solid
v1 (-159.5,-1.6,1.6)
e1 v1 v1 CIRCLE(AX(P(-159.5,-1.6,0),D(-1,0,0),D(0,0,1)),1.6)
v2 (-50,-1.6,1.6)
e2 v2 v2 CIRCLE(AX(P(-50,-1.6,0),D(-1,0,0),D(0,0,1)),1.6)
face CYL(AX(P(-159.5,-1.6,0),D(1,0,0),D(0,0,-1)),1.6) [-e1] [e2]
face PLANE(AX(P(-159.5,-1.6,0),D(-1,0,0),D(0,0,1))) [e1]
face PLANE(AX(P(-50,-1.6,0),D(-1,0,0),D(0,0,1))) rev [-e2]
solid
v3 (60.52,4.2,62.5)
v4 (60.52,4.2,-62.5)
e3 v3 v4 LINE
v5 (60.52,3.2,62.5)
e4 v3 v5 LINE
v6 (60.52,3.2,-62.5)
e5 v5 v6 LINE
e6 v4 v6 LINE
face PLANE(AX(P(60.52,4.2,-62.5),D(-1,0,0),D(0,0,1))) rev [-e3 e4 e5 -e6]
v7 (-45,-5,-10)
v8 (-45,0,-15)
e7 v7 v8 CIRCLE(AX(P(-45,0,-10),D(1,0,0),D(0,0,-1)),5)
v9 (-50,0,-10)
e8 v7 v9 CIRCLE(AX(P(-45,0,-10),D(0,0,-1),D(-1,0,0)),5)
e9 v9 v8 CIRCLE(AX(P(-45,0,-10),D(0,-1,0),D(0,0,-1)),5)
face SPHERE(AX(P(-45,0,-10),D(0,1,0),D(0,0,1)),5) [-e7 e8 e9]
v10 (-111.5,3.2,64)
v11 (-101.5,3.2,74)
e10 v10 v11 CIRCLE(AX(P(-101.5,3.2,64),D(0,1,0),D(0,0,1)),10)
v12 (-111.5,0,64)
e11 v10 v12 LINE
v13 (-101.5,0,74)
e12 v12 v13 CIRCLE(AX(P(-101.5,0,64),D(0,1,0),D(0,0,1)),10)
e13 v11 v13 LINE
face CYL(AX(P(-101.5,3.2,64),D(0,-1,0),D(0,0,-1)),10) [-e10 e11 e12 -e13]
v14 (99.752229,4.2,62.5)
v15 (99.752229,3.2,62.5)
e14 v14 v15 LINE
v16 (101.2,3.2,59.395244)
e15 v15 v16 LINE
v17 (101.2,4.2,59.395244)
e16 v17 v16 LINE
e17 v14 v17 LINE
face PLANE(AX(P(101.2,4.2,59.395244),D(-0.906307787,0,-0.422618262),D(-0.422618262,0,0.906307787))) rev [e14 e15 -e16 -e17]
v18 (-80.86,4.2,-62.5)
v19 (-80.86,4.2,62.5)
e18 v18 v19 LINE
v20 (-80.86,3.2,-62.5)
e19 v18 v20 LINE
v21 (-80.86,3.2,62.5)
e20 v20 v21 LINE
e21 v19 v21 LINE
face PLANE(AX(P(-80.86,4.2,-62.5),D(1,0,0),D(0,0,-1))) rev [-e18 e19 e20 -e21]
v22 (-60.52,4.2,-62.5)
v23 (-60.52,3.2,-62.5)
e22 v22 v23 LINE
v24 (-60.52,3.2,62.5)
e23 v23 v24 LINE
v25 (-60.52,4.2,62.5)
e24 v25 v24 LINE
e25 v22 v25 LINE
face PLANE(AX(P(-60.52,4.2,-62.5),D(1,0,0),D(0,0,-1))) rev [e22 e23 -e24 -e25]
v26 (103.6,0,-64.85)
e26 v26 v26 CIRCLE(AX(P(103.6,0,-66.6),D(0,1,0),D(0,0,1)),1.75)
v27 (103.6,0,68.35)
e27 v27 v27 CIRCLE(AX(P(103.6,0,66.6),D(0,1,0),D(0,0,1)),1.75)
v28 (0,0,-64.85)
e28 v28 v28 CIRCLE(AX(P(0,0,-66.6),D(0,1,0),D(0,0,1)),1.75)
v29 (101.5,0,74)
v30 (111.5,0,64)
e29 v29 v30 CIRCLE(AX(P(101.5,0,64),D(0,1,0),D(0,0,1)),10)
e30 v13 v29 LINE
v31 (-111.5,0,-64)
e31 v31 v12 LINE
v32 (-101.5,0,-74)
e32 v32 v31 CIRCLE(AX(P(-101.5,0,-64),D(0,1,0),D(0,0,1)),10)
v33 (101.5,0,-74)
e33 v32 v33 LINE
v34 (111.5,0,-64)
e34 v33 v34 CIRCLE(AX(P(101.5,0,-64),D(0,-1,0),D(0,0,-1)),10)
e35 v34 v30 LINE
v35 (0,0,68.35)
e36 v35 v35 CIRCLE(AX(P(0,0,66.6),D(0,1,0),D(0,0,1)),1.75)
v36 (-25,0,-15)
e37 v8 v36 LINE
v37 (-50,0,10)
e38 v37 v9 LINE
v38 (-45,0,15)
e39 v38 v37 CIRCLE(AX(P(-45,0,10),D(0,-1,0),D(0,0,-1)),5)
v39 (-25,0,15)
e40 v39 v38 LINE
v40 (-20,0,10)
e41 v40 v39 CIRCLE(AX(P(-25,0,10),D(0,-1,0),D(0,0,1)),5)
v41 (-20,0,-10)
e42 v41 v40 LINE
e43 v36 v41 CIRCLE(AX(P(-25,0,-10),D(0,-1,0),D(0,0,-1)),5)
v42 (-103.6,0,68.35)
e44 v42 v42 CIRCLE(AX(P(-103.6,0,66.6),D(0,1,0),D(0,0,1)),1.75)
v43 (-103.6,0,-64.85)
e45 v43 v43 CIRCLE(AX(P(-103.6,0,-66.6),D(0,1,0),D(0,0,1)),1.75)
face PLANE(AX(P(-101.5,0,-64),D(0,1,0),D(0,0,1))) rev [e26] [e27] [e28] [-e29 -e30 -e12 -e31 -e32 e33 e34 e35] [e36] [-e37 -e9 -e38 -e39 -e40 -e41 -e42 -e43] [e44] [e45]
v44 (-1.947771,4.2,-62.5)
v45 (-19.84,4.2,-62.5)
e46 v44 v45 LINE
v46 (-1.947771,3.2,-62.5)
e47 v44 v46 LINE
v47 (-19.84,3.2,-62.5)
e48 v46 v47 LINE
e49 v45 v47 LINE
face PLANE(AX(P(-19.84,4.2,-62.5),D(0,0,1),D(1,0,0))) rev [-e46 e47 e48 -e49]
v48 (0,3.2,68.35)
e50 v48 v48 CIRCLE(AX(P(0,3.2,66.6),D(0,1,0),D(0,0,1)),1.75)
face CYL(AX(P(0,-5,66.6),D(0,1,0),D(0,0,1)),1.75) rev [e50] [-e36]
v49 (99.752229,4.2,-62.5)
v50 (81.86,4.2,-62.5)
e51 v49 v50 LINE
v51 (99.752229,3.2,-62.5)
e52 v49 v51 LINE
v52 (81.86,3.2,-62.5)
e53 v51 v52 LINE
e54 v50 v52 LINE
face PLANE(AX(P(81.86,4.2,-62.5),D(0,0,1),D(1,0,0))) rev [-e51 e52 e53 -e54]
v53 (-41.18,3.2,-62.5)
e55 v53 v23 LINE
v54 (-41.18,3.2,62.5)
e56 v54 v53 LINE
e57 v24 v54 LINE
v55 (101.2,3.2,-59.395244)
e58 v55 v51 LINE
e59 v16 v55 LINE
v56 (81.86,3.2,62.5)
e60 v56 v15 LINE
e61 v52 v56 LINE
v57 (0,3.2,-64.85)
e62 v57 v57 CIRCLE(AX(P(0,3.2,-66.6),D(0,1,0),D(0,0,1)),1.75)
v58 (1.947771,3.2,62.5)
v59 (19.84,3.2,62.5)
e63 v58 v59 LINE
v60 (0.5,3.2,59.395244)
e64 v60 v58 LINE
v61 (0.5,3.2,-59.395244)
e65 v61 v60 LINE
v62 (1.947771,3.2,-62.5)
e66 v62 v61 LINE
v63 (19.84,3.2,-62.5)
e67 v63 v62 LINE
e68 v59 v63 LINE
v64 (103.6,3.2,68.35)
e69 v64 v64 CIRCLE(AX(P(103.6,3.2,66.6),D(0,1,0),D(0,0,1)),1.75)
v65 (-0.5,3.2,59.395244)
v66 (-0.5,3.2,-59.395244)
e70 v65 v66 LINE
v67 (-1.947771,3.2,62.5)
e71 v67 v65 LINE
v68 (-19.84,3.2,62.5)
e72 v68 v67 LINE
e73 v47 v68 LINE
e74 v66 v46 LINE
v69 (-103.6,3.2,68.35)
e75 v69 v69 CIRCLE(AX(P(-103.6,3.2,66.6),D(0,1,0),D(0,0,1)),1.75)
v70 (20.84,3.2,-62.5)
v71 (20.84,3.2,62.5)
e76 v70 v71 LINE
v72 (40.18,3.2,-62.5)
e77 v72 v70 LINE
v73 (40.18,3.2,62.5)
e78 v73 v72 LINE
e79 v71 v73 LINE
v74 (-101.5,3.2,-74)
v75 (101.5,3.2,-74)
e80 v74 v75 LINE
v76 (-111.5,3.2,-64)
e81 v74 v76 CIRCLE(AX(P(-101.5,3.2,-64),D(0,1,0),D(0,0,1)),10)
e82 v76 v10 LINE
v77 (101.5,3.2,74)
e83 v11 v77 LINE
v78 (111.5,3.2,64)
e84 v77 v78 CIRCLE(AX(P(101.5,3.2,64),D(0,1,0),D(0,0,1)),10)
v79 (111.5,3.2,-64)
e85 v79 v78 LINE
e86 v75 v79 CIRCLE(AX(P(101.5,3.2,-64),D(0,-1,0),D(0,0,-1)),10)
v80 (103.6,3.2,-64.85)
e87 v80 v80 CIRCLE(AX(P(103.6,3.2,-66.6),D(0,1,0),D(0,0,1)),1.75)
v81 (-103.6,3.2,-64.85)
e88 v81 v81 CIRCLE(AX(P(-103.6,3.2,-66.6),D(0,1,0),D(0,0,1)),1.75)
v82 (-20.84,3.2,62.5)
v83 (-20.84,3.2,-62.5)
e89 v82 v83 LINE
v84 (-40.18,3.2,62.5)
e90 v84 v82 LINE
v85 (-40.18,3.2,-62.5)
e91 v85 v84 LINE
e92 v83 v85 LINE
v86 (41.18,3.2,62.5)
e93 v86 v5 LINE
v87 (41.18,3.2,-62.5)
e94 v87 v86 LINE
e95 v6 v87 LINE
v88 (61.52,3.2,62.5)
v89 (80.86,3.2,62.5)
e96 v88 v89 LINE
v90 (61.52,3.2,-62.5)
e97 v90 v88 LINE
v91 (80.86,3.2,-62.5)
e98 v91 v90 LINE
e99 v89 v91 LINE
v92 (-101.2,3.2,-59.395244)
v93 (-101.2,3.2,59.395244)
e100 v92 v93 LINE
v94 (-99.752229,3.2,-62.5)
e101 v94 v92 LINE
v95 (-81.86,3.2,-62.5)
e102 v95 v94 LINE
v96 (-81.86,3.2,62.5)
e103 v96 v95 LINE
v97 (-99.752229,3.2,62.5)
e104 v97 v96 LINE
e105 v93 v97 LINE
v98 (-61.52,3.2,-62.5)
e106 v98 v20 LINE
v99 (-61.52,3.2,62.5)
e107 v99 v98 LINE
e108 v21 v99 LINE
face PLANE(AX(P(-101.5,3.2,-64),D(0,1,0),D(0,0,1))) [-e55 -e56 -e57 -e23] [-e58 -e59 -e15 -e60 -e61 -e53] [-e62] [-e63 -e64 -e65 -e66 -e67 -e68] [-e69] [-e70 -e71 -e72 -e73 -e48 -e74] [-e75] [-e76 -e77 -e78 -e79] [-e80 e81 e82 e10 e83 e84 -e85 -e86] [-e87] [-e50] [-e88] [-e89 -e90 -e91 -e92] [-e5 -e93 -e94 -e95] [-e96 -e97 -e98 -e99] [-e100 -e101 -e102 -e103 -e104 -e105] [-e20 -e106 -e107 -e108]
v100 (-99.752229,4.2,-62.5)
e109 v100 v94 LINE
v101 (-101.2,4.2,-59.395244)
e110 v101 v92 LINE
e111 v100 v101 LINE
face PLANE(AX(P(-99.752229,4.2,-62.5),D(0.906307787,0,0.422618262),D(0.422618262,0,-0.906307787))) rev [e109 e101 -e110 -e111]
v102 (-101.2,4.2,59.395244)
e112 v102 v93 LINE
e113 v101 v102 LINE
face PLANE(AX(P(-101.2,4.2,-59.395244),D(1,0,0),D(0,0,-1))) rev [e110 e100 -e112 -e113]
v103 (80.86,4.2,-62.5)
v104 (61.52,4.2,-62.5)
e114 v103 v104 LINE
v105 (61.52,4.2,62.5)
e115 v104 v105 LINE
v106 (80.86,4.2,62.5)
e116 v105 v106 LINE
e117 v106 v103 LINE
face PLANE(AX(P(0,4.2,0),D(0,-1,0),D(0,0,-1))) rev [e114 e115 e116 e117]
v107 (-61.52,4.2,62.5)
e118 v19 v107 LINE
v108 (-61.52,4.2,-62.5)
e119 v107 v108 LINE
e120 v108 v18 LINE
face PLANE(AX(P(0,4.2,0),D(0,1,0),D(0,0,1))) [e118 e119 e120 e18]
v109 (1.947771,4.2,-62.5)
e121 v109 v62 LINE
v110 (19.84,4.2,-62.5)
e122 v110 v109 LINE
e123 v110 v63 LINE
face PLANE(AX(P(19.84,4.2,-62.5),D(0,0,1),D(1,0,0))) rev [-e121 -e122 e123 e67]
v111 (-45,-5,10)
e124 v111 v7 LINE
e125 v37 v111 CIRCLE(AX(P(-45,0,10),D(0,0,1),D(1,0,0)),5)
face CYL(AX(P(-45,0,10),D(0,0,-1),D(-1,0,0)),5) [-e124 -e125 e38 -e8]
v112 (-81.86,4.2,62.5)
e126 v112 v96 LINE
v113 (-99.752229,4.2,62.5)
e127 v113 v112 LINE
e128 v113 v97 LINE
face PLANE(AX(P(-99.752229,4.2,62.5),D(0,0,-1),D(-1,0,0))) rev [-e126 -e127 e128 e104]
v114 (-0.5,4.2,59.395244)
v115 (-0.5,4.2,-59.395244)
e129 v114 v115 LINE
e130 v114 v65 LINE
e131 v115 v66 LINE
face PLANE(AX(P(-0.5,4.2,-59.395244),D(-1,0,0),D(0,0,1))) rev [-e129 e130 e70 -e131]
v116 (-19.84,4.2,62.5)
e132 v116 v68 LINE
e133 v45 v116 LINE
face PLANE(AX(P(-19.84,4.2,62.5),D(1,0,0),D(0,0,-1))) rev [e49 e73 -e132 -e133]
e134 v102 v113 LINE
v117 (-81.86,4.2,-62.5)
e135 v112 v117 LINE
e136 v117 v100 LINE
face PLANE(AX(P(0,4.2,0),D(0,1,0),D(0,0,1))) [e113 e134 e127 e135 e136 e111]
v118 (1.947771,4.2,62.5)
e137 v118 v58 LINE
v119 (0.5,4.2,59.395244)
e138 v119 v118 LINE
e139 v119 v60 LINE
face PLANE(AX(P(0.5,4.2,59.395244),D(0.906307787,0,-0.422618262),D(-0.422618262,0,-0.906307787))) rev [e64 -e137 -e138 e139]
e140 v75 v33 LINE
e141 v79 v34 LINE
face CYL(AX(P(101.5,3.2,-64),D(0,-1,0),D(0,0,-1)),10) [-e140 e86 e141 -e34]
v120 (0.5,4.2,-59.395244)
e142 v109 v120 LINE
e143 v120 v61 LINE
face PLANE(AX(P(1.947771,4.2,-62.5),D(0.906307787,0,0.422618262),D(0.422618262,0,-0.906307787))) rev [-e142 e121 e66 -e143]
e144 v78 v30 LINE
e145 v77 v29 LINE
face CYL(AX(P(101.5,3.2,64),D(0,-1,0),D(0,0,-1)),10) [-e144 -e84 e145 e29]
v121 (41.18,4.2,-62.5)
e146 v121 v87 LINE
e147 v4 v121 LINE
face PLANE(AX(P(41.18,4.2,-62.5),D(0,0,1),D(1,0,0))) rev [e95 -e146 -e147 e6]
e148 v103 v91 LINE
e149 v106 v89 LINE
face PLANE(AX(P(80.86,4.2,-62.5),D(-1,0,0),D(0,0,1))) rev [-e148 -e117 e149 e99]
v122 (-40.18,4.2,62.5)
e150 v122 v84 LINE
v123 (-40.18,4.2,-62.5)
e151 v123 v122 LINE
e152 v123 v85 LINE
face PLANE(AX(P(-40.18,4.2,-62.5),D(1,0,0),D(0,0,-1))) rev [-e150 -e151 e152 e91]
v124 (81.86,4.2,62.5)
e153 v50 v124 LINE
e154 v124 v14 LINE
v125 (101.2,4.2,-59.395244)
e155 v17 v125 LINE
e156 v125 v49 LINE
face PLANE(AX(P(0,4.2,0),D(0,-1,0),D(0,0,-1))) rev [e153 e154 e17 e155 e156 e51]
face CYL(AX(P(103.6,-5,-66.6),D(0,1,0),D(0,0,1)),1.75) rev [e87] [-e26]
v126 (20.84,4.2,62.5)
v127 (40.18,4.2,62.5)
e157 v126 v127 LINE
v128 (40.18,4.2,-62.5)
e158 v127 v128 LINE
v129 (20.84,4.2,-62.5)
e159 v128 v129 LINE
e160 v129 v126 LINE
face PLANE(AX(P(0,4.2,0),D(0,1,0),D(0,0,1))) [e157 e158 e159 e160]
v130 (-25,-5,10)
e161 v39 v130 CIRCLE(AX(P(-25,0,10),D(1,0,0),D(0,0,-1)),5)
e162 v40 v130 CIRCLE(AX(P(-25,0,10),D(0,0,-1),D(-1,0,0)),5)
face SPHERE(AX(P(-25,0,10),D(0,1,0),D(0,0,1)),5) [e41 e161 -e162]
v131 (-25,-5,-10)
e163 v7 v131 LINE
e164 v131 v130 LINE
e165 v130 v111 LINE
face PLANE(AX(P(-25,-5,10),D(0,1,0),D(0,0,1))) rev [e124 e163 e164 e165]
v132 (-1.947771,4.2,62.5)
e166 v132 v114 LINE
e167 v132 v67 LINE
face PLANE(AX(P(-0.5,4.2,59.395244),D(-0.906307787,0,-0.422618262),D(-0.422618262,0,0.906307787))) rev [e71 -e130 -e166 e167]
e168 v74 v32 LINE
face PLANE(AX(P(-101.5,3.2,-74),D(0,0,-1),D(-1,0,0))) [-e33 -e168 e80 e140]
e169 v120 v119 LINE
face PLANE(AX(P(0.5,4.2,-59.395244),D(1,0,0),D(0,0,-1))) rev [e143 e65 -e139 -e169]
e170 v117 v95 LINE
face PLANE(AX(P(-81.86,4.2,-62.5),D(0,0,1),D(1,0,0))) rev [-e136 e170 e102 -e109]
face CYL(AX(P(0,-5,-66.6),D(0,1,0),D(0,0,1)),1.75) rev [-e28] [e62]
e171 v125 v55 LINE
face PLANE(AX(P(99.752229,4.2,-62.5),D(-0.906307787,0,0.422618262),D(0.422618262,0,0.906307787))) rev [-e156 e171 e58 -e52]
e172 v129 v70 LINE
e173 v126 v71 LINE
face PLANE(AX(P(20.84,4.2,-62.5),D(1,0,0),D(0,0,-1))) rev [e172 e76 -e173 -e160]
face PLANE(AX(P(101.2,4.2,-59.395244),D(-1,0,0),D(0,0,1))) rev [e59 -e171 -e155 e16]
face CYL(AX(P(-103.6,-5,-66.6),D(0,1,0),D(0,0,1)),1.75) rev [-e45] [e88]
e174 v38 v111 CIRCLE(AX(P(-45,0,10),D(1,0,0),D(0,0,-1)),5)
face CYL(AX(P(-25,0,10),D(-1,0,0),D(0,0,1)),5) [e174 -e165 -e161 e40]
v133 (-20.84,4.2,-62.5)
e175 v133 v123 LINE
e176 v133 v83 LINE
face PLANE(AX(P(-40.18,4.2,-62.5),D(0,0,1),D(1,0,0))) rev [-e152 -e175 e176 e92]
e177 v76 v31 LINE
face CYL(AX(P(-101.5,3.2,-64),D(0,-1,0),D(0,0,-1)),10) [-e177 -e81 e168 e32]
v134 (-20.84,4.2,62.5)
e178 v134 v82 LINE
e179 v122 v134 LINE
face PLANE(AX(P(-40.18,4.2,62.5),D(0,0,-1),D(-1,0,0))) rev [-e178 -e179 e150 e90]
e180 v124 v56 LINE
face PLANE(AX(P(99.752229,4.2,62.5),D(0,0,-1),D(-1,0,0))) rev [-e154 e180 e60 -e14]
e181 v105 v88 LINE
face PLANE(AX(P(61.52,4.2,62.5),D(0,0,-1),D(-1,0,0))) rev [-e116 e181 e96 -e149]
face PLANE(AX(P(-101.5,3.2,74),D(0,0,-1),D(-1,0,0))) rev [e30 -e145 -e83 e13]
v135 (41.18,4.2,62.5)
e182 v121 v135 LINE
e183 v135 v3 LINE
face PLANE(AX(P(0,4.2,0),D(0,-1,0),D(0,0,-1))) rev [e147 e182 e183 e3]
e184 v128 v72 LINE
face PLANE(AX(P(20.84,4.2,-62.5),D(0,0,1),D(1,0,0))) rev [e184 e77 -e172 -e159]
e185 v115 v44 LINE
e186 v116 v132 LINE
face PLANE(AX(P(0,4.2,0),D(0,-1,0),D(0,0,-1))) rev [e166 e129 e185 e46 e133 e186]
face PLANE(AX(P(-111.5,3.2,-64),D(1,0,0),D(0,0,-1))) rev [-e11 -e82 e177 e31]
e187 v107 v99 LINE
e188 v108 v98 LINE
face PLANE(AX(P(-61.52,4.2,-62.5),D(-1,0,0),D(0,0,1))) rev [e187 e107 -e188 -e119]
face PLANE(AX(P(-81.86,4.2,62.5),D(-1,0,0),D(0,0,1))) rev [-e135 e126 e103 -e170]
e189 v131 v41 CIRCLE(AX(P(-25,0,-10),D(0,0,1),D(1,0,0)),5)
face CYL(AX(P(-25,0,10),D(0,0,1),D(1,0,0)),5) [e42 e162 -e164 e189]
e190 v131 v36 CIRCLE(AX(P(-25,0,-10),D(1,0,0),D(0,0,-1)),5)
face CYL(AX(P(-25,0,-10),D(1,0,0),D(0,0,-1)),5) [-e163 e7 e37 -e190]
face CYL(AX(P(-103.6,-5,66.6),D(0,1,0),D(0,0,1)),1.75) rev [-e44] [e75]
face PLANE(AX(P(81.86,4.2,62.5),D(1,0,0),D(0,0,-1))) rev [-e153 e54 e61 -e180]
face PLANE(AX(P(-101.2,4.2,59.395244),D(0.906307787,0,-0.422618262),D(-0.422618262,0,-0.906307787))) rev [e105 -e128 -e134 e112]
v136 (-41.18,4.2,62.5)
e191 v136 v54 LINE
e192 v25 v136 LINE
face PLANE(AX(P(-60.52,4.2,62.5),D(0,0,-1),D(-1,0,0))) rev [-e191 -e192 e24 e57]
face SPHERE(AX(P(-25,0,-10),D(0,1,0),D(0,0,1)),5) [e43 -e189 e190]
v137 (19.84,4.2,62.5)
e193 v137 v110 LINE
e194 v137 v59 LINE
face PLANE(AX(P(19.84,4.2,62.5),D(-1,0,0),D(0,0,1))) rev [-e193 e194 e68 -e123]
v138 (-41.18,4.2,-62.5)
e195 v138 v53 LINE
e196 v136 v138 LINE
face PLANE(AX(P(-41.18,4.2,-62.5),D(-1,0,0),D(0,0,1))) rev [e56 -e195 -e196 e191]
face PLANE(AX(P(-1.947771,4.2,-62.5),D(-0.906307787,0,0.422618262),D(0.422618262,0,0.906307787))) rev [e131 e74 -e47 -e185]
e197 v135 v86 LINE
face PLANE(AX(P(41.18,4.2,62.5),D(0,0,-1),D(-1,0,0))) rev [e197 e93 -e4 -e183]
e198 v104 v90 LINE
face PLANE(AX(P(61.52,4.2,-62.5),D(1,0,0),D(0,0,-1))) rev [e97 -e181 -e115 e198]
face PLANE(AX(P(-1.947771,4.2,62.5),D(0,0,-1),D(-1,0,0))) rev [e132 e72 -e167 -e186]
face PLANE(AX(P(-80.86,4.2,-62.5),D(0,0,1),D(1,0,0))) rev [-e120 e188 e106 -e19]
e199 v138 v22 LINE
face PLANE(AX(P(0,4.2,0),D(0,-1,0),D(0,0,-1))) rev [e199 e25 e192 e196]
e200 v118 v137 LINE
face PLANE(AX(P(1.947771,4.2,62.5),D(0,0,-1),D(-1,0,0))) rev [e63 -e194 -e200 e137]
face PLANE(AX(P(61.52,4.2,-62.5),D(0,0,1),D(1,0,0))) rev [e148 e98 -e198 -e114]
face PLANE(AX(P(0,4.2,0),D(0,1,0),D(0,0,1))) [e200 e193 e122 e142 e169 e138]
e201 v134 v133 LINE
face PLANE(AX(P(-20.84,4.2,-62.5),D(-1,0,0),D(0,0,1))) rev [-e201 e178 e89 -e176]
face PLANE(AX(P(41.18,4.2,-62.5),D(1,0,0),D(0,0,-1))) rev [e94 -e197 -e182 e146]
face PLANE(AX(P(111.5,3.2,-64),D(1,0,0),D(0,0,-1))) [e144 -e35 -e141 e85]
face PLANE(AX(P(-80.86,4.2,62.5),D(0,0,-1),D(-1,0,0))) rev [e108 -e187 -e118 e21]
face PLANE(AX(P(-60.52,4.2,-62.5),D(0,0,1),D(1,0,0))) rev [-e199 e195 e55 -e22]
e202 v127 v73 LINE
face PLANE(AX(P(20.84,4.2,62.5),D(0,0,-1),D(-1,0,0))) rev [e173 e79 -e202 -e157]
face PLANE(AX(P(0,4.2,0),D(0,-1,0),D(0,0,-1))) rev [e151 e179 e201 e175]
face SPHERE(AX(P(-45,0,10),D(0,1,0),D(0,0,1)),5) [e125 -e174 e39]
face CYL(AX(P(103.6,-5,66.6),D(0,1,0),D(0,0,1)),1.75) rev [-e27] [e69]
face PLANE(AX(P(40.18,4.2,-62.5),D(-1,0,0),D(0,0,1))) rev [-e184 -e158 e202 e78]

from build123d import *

# Parameters (mm, degrees)
BOSS_EXTRUDE1_DEPTH      = 3.2
BOSS_EXTRUDE2_DEPTH      = 5
FILLET1_R                = 5
BOSS_EXTRUDE5_DEPTH      = 48
BOSS_EXTRUDE5_DEPTH_BACK = 61.5
SKETCH3_R                = 1.6
SKETCH4_R                = 1.75
CUT_EXTRUDE2_DEPTH       = 177.021277123
SKETCH5_W                = 19.34
SKETCH5_H                = 125
BOSS_EXTRUDE6_DEPTH      = 1


with BuildPart() as part:
    # Sketch1 → Boss-Extrude1 (new body)
    with BuildSketch(Plane(origin=(0, 0, 0), x_dir=(1, 0, 0), z_dir=(0, 1, 0))):
        with BuildLine():
            Line((-101.5, 74), (101.5, 74))
            ThreePointArc((101.5, 74), (108.571067812, 71.071067812), (111.5, 64))
            Line((111.5, 64), (111.5, -64))
            ThreePointArc((111.5, -64), (108.571067812, -71.071067812), (101.5, -74))
            Line((101.5, -74), (-101.5, -74))
            ThreePointArc((-101.5, -74), (-108.571067812, -71.071067812), (-111.5, -64))
            Line((-111.5, -64), (-111.5, 64))
            ThreePointArc((-111.5, 64), (-108.571067812, 71.071067812), (-101.5, 74))
        make_face()
    extrude(amount=BOSS_EXTRUDE1_DEPTH)

    # Sketch2 → Boss-Extrude2 (add)
    with BuildSketch(Plane.XZ):
        with BuildLine():
            Line((-45, 15), (-25, 15))
            ThreePointArc((-25, 15), (-21.464466094, 13.535533906), (-20, 10))
            Line((-20, 10), (-20, -10))
            ThreePointArc((-20, -10), (-21.464466094, -13.535533906), (-25, -15))
            Line((-25, -15), (-45, -15))
            ThreePointArc((-45, -15), (-48.535533906, -13.535533906), (-50, -10))
            Line((-50, -10), (-50, 10))
            ThreePointArc((-50, 10), (-48.535533906, 13.535533906), (-45, 15))
        make_face()
    extrude(amount=BOSS_EXTRUDE2_DEPTH)

    # Fillet1
    fillet1_edges = [part.edges().sort_by_distance(p)[0] for p in [
        (-20, -5, 0),
        (-21.464466094, -5, -13.535533906),
        (-35, -5, -15),
        (-48.535533906, -5, -13.535533906),
        (-50, -5, 0),
        (-48.535533906, -5, 13.535533906),
        (-35, -5, 15),
        (-21.464466094, -5, 13.535533906),
    ]]
    fillet(fillet1_edges, radius=FILLET1_R - 0.0001)  # a hair under: the kernel refuses the full size

    # Sketch4 → Cut-Extrude2 (cut, through all)
    with BuildSketch(Plane(origin=(0, 3.2, 0), x_dir=(1, 0, 0), z_dir=(0, 1, 0))):
        with Locations(Location((-103.6, 66.6, 0), (0, 0, 270))):
            Circle(SKETCH4_R)
        with Locations(Location((0, 66.6, 0), (0, 0, 270))):
            Circle(SKETCH4_R)
        with Locations(Location((103.6, 66.6, 0), (0, 0, 270))):
            Circle(SKETCH4_R)
        with Locations(Location((0, -66.6, 0), (0, 0, 270))):
            Circle(SKETCH4_R)
        with Locations(Location((103.6, -66.6, 0), (0, 0, 270))):
            Circle(SKETCH4_R)
        with Locations(Location((-103.6, -66.6, 0), (0, 0, 270))):
            Circle(SKETCH4_R)
    extrude(amount=-CUT_EXTRUDE2_DEPTH, mode=Mode.SUBTRACT)

    # Sketch5 → Boss-Extrude6 (add)
    with BuildSketch(Plane(origin=(0, 3.2, 0), x_dir=(1, 0, 0), z_dir=(0, 1, 0))):
        with Locations((-50.85, 0)):
            Rectangle(SKETCH5_W, SKETCH5_H)
        Polygon((-99.752228661, 62.5), (-101.2, 59.395244345), (-101.2, -59.395244345), (-99.752228661, -62.5), (-81.86, -62.5), (-81.86, 62.5), align=None)
        with Locations((-71.19, 0)):
            Rectangle(SKETCH5_W, SKETCH5_H)
        with Locations((-30.51, 0)):
            Rectangle(SKETCH5_W, SKETCH5_H)
        Polygon((-1.947771339, -62.5), (-19.84, -62.5), (-19.84, 62.5), (-1.947771339, 62.5), (-0.5, 59.395244345), (-0.5, -59.395244345), align=None)
        with Locations((50.85, 0)):
            Rectangle(SKETCH5_W, SKETCH5_H)
        Polygon((1.947771339, 62.5), (0.5, 59.395244345), (0.5, -59.395244345), (1.947771339, -62.5), (19.84, -62.5), (19.84, 62.5), align=None)
        with Locations((30.51, 0)):
            Rectangle(SKETCH5_W, SKETCH5_H)
        with Locations((71.19, 0)):
            Rectangle(SKETCH5_W, SKETCH5_H)
        Polygon((99.752228661, -62.5), (81.86, -62.5), (81.86, 62.5), (99.752228661, 62.5), (101.2, 59.395244345), (101.2, -59.395244345), align=None)
    extrude(amount=BOSS_EXTRUDE6_DEPTH)


with BuildPart() as body_2:
    # Sketch3 → Boss-Extrude5 (new, two sides: drawn at the far end of the back side and taken through both)
    with BuildSketch(Plane.ZY.offset(111.5).offset(-BOSS_EXTRUDE5_DEPTH_BACK)):
        with Locations((0, -1.6)):
            Circle(SKETCH3_R)
    extrude(amount=BOSS_EXTRUDE5_DEPTH + BOSS_EXTRUDE5_DEPTH_BACK)


solid = Compound([part.part, body_2.part])
